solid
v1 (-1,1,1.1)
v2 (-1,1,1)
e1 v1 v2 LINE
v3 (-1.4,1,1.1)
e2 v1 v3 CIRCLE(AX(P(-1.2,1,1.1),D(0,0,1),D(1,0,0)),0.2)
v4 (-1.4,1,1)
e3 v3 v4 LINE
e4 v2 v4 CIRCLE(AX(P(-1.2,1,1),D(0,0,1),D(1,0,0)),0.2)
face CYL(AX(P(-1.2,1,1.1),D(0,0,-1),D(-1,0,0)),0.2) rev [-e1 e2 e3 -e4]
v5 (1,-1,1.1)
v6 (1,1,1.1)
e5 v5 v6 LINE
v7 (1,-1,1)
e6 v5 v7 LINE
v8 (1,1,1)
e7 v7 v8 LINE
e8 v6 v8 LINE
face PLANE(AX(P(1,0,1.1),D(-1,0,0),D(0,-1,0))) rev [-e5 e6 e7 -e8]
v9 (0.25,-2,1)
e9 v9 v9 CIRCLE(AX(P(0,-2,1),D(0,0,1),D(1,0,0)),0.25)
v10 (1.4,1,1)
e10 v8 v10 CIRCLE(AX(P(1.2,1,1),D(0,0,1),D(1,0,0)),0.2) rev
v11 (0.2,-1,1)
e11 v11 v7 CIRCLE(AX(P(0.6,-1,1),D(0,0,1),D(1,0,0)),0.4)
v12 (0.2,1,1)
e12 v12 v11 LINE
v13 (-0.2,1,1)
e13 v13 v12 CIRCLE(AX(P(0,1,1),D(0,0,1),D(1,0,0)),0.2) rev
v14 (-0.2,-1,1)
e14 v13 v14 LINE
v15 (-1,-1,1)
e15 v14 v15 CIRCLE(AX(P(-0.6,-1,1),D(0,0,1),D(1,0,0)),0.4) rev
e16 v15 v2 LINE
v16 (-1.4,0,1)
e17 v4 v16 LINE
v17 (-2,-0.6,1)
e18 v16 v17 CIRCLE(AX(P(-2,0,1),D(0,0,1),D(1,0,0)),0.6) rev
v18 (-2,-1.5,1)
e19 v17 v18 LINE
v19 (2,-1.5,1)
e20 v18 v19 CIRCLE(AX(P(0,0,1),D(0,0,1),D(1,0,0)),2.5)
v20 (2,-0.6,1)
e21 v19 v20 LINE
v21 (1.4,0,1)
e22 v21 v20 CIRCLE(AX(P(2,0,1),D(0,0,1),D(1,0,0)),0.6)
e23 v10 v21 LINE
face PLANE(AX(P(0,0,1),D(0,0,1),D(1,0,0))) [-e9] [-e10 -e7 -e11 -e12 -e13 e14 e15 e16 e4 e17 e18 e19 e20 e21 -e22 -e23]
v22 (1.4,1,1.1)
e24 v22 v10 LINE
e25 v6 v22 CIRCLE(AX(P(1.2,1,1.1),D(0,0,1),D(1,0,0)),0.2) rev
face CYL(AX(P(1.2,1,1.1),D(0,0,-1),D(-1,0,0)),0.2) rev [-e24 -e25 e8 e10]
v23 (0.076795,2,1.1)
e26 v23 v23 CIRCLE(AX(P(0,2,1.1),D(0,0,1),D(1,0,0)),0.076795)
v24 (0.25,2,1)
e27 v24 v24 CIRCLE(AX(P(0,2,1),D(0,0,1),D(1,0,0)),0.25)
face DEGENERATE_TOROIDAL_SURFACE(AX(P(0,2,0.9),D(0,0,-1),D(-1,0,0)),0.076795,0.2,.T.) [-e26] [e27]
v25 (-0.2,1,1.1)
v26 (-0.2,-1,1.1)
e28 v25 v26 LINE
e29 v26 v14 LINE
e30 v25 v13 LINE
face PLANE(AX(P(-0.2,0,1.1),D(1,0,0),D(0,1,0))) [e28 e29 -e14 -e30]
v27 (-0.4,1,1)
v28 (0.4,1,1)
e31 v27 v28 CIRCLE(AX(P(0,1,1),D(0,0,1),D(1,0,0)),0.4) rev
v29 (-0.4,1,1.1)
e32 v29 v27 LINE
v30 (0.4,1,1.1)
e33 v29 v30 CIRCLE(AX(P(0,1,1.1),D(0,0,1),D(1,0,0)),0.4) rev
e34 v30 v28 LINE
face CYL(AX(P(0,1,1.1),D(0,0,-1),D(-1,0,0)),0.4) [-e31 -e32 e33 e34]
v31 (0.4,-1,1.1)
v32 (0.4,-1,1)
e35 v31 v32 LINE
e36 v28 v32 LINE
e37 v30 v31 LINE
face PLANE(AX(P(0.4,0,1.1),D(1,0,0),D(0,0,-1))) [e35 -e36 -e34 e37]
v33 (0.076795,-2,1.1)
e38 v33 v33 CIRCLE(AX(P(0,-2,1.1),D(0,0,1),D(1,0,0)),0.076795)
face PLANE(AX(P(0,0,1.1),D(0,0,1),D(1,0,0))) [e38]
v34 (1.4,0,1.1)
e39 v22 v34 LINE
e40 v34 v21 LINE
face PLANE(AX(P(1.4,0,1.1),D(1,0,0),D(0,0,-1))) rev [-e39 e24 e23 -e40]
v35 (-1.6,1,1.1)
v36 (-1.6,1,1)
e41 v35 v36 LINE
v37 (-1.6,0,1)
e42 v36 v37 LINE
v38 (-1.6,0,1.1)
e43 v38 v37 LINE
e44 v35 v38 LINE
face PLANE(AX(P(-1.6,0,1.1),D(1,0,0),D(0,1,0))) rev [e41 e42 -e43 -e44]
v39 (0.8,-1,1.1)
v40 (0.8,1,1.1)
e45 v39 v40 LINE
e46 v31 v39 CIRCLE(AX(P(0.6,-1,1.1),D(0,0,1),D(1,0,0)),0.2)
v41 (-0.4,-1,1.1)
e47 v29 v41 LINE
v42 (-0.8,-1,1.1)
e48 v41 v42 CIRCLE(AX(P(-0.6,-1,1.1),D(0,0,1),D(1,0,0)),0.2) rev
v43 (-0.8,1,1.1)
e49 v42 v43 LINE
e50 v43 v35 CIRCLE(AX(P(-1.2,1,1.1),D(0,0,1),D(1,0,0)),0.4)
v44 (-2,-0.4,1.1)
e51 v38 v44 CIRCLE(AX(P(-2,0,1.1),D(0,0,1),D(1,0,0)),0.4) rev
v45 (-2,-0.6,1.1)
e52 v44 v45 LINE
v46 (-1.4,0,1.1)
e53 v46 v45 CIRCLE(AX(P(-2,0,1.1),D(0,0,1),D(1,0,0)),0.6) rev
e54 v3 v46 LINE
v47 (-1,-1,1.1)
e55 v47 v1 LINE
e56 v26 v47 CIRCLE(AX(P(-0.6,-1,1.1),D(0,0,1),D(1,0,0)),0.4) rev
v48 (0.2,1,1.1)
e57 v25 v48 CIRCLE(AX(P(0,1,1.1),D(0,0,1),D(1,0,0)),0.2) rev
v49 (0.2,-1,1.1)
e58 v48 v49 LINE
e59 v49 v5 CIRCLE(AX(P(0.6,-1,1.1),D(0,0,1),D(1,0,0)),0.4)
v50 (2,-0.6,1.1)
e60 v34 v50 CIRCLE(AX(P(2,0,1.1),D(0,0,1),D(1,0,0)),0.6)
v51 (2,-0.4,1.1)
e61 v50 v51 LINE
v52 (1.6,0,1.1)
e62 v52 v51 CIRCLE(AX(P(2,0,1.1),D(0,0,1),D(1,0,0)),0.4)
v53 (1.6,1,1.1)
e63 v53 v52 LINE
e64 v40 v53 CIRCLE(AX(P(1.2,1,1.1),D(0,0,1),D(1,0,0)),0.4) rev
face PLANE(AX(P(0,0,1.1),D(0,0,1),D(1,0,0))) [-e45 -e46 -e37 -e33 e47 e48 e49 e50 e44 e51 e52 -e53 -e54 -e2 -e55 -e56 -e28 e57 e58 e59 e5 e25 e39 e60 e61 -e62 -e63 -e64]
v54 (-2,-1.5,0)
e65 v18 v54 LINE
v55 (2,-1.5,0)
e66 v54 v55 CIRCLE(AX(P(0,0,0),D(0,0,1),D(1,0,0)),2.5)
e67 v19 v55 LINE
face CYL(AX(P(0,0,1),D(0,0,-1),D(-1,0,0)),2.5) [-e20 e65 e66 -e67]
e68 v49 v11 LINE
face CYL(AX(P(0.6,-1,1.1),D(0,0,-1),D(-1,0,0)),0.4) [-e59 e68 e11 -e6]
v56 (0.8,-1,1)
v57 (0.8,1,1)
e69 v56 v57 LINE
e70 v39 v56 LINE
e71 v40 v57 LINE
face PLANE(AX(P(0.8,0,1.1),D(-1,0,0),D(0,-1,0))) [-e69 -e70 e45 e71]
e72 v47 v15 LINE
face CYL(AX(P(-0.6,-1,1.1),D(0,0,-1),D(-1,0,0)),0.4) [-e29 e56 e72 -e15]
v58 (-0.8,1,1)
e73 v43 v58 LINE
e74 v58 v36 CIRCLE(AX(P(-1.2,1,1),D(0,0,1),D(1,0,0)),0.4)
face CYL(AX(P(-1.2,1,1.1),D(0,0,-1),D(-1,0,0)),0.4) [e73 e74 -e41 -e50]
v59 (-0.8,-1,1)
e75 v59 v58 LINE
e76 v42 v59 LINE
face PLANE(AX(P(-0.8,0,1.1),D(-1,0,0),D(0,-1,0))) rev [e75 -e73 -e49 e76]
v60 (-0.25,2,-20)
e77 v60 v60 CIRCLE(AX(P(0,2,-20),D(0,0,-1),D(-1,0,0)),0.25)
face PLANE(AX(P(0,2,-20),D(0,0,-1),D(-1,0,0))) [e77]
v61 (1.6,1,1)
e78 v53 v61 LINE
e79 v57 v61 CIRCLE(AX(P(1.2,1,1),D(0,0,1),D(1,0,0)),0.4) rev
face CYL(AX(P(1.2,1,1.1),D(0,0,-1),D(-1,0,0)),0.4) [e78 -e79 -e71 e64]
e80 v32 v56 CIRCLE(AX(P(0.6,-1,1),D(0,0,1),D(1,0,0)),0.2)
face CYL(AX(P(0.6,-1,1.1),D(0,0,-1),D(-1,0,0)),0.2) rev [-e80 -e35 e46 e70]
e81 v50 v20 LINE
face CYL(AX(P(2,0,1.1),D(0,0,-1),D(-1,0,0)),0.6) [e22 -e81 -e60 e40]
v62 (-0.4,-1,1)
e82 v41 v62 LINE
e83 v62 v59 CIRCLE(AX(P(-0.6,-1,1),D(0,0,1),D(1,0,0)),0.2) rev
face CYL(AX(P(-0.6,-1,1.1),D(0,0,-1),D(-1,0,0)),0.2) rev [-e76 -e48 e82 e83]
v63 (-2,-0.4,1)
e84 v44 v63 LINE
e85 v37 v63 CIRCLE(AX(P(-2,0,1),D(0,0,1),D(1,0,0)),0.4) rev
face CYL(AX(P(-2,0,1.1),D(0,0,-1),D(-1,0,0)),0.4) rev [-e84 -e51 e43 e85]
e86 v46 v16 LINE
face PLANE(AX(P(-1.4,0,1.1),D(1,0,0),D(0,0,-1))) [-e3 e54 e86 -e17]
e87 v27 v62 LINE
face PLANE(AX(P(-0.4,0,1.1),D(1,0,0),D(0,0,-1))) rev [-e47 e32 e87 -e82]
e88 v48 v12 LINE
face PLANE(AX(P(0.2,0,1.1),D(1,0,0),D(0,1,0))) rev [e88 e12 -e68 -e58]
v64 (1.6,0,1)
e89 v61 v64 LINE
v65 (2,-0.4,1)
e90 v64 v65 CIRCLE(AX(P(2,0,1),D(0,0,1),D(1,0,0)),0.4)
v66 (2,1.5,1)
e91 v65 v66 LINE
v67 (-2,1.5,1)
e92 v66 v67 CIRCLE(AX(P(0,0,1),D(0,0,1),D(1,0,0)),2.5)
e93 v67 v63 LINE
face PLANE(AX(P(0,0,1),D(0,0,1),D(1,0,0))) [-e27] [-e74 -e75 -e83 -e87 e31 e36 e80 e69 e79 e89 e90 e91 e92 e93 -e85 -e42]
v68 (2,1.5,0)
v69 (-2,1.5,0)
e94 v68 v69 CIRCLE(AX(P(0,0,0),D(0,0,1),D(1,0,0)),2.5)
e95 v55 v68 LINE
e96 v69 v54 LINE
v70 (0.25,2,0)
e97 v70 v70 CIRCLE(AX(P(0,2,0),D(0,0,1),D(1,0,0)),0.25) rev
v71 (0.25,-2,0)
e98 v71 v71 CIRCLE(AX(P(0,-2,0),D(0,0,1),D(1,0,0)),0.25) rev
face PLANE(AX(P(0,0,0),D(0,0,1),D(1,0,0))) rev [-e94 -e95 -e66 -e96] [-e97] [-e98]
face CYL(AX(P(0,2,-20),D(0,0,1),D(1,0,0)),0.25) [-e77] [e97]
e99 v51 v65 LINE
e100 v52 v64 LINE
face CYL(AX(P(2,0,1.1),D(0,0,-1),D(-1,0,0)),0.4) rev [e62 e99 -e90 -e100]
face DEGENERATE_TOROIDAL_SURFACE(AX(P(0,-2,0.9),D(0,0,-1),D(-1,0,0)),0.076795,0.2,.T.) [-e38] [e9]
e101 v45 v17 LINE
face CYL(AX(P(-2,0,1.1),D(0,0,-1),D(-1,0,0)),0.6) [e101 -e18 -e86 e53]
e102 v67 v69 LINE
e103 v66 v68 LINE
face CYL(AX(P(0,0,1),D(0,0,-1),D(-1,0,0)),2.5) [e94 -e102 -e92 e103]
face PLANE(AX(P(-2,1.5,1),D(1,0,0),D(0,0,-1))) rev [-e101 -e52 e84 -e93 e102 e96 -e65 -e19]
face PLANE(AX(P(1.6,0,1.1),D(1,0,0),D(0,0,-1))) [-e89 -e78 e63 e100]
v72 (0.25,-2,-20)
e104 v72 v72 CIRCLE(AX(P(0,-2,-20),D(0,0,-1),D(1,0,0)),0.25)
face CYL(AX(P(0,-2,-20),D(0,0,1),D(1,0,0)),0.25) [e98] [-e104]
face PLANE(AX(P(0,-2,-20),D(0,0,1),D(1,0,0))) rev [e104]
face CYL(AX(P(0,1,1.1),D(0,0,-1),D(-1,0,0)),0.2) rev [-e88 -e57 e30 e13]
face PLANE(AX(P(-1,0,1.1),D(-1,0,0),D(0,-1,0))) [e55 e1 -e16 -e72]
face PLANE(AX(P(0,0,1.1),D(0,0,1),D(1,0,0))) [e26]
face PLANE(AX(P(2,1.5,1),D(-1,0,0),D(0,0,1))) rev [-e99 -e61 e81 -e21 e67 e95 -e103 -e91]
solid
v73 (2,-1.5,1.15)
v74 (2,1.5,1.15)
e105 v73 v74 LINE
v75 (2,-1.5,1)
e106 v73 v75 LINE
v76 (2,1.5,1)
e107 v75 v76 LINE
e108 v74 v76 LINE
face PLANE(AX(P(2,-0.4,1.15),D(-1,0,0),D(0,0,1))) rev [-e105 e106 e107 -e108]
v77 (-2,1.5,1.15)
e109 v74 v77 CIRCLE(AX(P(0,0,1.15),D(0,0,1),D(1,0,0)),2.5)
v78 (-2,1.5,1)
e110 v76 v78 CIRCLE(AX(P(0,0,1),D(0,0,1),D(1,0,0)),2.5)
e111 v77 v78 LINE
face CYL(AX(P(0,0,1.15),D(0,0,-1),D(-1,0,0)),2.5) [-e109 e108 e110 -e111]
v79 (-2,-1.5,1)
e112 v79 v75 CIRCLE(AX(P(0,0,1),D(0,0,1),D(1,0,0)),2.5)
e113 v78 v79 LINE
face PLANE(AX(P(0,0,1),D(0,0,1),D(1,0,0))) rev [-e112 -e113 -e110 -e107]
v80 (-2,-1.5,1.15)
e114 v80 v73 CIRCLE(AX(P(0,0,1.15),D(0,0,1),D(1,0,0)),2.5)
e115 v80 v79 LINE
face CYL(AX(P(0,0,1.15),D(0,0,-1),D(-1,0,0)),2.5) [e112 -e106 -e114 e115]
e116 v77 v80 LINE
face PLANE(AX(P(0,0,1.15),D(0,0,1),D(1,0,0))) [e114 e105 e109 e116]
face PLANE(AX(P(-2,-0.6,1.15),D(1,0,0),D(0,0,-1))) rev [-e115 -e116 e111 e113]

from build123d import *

# Parameters (mm, degrees)
BOSS_EXTRUDE1_DEPTH = 1
SKETCH3_R           = 0.25
BOSS_EXTRUDE2_DEPTH = 0.1
FILLET1_R           = 0.2
BOSS_EXTRUDE3_DEPTH = 0.15
SKETCH5_R           = 0.25
BOSS_EXTRUDE4_DEPTH = 20


with BuildPart() as part:
    # Sketch1 → Boss-Extrude1 (new body)
    with BuildSketch(Plane.XY):
        with BuildLine():
            Line((-2, 1.5), (-2, -1.5))
            ThreePointArc((-2, -1.5), (0, -2.5), (2, -1.5))
            Line((2, -1.5), (2, 1.5))
            ThreePointArc((2, 1.5), (0, 2.5), (-2, 1.5))
        make_face()
    extrude(amount=BOSS_EXTRUDE1_DEPTH)

    # Sketch3 → Boss-Extrude2 (add)
    with BuildSketch(Plane.XY.offset(1)):
        with BuildLine():
            ThreePointArc((0.3, 1), (0, 1.3), (-0.3, 1))
            Line((-0.3, 1), (-0.3, 0))
            Line((-0.3, 0), (-0.3, -1))
            ThreePointArc((-0.3, -1), (-0.6, -1.3), (-0.9, -1))
            Line((-0.9, -1), (-0.9, 1))
            ThreePointArc((-0.9, 1), (-1.2, 1.3), (-1.5, 1))
            Line((-1.5, 1), (-1.5, 0))
            ThreePointArc((-1.5, 0), (-1.646446609, -0.353553391), (-2, -0.5))
            Line((-2, -0.5), (-2, -0.6))
            ThreePointArc((-2, -0.6), (-1.575735931, -0.424264069), (-1.4, 0))
            Line((-1.4, 0), (-1.4, 1))
            ThreePointArc((-1.4, 1), (-1.2, 1.2), (-1, 1))
            Line((-1, 1), (-1, -1))
            ThreePointArc((-1, -1), (-0.6, -1.4), (-0.2, -1))
            Line((-0.2, -1), (-0.2, 0))
            Line((-0.2, 0), (-0.2, 1))
            ThreePointArc((-0.2, 1), (0, 1.2), (0.2, 1))
            Line((0.2, 1), (0.2, 0))
            Line((0.2, 0), (0.2, -1))
            ThreePointArc((0.2, -1), (0.6, -1.4), (1, -1))
            Line((1, -1), (1, 1))
            ThreePointArc((1, 1), (1.2, 1.2), (1.4, 1))
            Line((1.4, 1), (1.4, 0))
            ThreePointArc((1.4, 0), (1.575735931, -0.424264069), (2, -0.6))
            Line((2, -0.6), (2, -0.5))
            ThreePointArc((2, -0.5), (1.646446609, -0.353553391), (1.5, 0))
            Line((1.5, 0), (1.5, 1))
            ThreePointArc((1.5, 1), (1.2, 1.3), (0.9, 1))
            Line((0.9, 1), (0.9, -1))
            ThreePointArc((0.9, -1), (0.6, -1.3), (0.3, -1))
            Line((0.3, -1), (0.3, 0))
            Line((0.3, 0), (0.3, 1))
        make_face()
        with BuildLine():
            Line((-0.3, 0), (-0.3, 1))
            ThreePointArc((-0.3, 1), (0, 1.3), (0.3, 1))
            Line((0.3, 1), (0.3, 0))
            Line((0.3, 0), (0.3, -1))
            ThreePointArc((0.3, -1), (0.6, -1.3), (0.9, -1))
            Line((0.9, -1), (0.9, 1))
            ThreePointArc((0.9, 1), (1.2, 1.3), (1.5, 1))
            Line((1.5, 1), (1.5, 0))
            ThreePointArc((1.5, 0), (1.646446609, -0.353553391), (2, -0.5))
            Line((2, -0.5), (2, -0.4))
            ThreePointArc((2, -0.4), (1.717157288, -0.282842712), (1.6, 0))
            Line((1.6, 0), (1.6, 1))
            ThreePointArc((1.6, 1), (1.2, 1.4), (0.8, 1))
            Line((0.8, 1), (0.8, -1))
            ThreePointArc((0.8, -1), (0.6, -1.2), (0.4, -1))
            Line((0.4, -1), (0.4, 0))
            Line((0.4, 0), (0.4, 1))
            ThreePointArc((0.4, 1), (0, 1.4), (-0.4, 1))
            Line((-0.4, 1), (-0.4, 0))
            Line((-0.4, 0), (-0.4, -1))
            ThreePointArc((-0.4, -1), (-0.6, -1.2), (-0.8, -1))
            Line((-0.8, -1), (-0.8, 1))
            ThreePointArc((-0.8, 1), (-1.2, 1.4), (-1.6, 1))
            Line((-1.6, 1), (-1.6, 0))
            ThreePointArc((-1.6, 0), (-1.717157288, -0.282842712), (-2, -0.4))
            Line((-2, -0.4), (-2, -0.5))
            ThreePointArc((-2, -0.5), (-1.646446609, -0.353553391), (-1.5, 0))
            Line((-1.5, 0), (-1.5, 1))
            ThreePointArc((-1.5, 1), (-1.2, 1.3), (-0.9, 1))
            Line((-0.9, 1), (-0.9, -1))
            ThreePointArc((-0.9, -1), (-0.6, -1.3), (-0.3, -1))
            Line((-0.3, -1), (-0.3, 0))
        make_face()
        with Locations((0, -2)):
            Circle(SKETCH3_R)
        with Locations((0, 2)):
            Circle(SKETCH3_R)
    extrude(amount=BOSS_EXTRUDE2_DEPTH)

    # Fillet1
    # the kernel refuses this fillet: 0.2 mm, written as the material it takes off along each edge
    with BuildSketch(Plane(origin=(0, -2, 1.1), x_dir=(1, 0, 0), z_dir=(0, -1, 0))) as fillet1_piece_1:
        with BuildLine():
            CenterArc((0.076794919, -0.2), FILLET1_R, 30, 60)
            Line((0.076794919, 0), (0.076794919, 0.004))
            Line((0.076794919, 0.004), (0.25, 0.004))
            Line((0.25, 0.004), (0.254, 0))
            ThreePointArc((0.254, 0), (0.254, -0.05), (0.253464102, -0.098))
            Line((0.253464102, -0.098), (0.25, -0.1))
        make_face()
    revolve(axis=Axis((0, -2, 1.1), (0, 0, 1)), mode=Mode.SUBTRACT)
    with BuildSketch(Plane(origin=(0, 2, 1.1), x_dir=(1, 0, 0), z_dir=(0, -1, 0))) as fillet1_piece_2:
        with BuildLine():
            CenterArc((0.076794919, -0.2), FILLET1_R, 30, 60)
            Line((0.076794919, 0), (0.076794919, 0.004))
            Line((0.076794919, 0.004), (0.25, 0.004))
            Line((0.25, 0.004), (0.254, 0))
            ThreePointArc((0.254, 0), (0.254, -0.05), (0.253464102, -0.098))
            Line((0.253464102, -0.098), (0.25, -0.1))
        make_face()
    revolve(axis=Axis((0, 2, 1.1), (0, 0, 1)), mode=Mode.SUBTRACT)

    # Sketch5 → Boss-Extrude4 (add)
    with BuildSketch(Plane(origin=(0, 0, 0), x_dir=(-1, 0, 0), z_dir=(0, 0, -1))):
        with Locations(Location((0, 2, 0), (0, 0, 180))):
            Circle(SKETCH5_R)
        with Locations(Location((0, -2, 0), (0, 0, 180))):
            Circle(SKETCH5_R)
    extrude(amount=BOSS_EXTRUDE4_DEPTH)


with BuildPart() as body_2:
    # Sketch4 → Boss-Extrude3 (new body)
    with BuildSketch(Plane.XY.offset(1)):
        with BuildLine():
            Line((-2, -0.4), (-2, -0.6))
            Line((-2, -0.6), (-2, -1.5))
            ThreePointArc((-2, -1.5), (0, -2.5), (2, -1.5))
            Line((2, -1.5), (2, -0.6))
            Line((2, -0.6), (2, -0.4))
            Line((2, -0.4), (2, 1.5))
            ThreePointArc((2, 1.5), (0, 2.5), (-2, 1.5))
            Line((-2, 1.5), (-2, -0.4))
        make_face()
    extrude(amount=BOSS_EXTRUDE3_DEPTH)


solid = Compound([part.part, body_2.part])
